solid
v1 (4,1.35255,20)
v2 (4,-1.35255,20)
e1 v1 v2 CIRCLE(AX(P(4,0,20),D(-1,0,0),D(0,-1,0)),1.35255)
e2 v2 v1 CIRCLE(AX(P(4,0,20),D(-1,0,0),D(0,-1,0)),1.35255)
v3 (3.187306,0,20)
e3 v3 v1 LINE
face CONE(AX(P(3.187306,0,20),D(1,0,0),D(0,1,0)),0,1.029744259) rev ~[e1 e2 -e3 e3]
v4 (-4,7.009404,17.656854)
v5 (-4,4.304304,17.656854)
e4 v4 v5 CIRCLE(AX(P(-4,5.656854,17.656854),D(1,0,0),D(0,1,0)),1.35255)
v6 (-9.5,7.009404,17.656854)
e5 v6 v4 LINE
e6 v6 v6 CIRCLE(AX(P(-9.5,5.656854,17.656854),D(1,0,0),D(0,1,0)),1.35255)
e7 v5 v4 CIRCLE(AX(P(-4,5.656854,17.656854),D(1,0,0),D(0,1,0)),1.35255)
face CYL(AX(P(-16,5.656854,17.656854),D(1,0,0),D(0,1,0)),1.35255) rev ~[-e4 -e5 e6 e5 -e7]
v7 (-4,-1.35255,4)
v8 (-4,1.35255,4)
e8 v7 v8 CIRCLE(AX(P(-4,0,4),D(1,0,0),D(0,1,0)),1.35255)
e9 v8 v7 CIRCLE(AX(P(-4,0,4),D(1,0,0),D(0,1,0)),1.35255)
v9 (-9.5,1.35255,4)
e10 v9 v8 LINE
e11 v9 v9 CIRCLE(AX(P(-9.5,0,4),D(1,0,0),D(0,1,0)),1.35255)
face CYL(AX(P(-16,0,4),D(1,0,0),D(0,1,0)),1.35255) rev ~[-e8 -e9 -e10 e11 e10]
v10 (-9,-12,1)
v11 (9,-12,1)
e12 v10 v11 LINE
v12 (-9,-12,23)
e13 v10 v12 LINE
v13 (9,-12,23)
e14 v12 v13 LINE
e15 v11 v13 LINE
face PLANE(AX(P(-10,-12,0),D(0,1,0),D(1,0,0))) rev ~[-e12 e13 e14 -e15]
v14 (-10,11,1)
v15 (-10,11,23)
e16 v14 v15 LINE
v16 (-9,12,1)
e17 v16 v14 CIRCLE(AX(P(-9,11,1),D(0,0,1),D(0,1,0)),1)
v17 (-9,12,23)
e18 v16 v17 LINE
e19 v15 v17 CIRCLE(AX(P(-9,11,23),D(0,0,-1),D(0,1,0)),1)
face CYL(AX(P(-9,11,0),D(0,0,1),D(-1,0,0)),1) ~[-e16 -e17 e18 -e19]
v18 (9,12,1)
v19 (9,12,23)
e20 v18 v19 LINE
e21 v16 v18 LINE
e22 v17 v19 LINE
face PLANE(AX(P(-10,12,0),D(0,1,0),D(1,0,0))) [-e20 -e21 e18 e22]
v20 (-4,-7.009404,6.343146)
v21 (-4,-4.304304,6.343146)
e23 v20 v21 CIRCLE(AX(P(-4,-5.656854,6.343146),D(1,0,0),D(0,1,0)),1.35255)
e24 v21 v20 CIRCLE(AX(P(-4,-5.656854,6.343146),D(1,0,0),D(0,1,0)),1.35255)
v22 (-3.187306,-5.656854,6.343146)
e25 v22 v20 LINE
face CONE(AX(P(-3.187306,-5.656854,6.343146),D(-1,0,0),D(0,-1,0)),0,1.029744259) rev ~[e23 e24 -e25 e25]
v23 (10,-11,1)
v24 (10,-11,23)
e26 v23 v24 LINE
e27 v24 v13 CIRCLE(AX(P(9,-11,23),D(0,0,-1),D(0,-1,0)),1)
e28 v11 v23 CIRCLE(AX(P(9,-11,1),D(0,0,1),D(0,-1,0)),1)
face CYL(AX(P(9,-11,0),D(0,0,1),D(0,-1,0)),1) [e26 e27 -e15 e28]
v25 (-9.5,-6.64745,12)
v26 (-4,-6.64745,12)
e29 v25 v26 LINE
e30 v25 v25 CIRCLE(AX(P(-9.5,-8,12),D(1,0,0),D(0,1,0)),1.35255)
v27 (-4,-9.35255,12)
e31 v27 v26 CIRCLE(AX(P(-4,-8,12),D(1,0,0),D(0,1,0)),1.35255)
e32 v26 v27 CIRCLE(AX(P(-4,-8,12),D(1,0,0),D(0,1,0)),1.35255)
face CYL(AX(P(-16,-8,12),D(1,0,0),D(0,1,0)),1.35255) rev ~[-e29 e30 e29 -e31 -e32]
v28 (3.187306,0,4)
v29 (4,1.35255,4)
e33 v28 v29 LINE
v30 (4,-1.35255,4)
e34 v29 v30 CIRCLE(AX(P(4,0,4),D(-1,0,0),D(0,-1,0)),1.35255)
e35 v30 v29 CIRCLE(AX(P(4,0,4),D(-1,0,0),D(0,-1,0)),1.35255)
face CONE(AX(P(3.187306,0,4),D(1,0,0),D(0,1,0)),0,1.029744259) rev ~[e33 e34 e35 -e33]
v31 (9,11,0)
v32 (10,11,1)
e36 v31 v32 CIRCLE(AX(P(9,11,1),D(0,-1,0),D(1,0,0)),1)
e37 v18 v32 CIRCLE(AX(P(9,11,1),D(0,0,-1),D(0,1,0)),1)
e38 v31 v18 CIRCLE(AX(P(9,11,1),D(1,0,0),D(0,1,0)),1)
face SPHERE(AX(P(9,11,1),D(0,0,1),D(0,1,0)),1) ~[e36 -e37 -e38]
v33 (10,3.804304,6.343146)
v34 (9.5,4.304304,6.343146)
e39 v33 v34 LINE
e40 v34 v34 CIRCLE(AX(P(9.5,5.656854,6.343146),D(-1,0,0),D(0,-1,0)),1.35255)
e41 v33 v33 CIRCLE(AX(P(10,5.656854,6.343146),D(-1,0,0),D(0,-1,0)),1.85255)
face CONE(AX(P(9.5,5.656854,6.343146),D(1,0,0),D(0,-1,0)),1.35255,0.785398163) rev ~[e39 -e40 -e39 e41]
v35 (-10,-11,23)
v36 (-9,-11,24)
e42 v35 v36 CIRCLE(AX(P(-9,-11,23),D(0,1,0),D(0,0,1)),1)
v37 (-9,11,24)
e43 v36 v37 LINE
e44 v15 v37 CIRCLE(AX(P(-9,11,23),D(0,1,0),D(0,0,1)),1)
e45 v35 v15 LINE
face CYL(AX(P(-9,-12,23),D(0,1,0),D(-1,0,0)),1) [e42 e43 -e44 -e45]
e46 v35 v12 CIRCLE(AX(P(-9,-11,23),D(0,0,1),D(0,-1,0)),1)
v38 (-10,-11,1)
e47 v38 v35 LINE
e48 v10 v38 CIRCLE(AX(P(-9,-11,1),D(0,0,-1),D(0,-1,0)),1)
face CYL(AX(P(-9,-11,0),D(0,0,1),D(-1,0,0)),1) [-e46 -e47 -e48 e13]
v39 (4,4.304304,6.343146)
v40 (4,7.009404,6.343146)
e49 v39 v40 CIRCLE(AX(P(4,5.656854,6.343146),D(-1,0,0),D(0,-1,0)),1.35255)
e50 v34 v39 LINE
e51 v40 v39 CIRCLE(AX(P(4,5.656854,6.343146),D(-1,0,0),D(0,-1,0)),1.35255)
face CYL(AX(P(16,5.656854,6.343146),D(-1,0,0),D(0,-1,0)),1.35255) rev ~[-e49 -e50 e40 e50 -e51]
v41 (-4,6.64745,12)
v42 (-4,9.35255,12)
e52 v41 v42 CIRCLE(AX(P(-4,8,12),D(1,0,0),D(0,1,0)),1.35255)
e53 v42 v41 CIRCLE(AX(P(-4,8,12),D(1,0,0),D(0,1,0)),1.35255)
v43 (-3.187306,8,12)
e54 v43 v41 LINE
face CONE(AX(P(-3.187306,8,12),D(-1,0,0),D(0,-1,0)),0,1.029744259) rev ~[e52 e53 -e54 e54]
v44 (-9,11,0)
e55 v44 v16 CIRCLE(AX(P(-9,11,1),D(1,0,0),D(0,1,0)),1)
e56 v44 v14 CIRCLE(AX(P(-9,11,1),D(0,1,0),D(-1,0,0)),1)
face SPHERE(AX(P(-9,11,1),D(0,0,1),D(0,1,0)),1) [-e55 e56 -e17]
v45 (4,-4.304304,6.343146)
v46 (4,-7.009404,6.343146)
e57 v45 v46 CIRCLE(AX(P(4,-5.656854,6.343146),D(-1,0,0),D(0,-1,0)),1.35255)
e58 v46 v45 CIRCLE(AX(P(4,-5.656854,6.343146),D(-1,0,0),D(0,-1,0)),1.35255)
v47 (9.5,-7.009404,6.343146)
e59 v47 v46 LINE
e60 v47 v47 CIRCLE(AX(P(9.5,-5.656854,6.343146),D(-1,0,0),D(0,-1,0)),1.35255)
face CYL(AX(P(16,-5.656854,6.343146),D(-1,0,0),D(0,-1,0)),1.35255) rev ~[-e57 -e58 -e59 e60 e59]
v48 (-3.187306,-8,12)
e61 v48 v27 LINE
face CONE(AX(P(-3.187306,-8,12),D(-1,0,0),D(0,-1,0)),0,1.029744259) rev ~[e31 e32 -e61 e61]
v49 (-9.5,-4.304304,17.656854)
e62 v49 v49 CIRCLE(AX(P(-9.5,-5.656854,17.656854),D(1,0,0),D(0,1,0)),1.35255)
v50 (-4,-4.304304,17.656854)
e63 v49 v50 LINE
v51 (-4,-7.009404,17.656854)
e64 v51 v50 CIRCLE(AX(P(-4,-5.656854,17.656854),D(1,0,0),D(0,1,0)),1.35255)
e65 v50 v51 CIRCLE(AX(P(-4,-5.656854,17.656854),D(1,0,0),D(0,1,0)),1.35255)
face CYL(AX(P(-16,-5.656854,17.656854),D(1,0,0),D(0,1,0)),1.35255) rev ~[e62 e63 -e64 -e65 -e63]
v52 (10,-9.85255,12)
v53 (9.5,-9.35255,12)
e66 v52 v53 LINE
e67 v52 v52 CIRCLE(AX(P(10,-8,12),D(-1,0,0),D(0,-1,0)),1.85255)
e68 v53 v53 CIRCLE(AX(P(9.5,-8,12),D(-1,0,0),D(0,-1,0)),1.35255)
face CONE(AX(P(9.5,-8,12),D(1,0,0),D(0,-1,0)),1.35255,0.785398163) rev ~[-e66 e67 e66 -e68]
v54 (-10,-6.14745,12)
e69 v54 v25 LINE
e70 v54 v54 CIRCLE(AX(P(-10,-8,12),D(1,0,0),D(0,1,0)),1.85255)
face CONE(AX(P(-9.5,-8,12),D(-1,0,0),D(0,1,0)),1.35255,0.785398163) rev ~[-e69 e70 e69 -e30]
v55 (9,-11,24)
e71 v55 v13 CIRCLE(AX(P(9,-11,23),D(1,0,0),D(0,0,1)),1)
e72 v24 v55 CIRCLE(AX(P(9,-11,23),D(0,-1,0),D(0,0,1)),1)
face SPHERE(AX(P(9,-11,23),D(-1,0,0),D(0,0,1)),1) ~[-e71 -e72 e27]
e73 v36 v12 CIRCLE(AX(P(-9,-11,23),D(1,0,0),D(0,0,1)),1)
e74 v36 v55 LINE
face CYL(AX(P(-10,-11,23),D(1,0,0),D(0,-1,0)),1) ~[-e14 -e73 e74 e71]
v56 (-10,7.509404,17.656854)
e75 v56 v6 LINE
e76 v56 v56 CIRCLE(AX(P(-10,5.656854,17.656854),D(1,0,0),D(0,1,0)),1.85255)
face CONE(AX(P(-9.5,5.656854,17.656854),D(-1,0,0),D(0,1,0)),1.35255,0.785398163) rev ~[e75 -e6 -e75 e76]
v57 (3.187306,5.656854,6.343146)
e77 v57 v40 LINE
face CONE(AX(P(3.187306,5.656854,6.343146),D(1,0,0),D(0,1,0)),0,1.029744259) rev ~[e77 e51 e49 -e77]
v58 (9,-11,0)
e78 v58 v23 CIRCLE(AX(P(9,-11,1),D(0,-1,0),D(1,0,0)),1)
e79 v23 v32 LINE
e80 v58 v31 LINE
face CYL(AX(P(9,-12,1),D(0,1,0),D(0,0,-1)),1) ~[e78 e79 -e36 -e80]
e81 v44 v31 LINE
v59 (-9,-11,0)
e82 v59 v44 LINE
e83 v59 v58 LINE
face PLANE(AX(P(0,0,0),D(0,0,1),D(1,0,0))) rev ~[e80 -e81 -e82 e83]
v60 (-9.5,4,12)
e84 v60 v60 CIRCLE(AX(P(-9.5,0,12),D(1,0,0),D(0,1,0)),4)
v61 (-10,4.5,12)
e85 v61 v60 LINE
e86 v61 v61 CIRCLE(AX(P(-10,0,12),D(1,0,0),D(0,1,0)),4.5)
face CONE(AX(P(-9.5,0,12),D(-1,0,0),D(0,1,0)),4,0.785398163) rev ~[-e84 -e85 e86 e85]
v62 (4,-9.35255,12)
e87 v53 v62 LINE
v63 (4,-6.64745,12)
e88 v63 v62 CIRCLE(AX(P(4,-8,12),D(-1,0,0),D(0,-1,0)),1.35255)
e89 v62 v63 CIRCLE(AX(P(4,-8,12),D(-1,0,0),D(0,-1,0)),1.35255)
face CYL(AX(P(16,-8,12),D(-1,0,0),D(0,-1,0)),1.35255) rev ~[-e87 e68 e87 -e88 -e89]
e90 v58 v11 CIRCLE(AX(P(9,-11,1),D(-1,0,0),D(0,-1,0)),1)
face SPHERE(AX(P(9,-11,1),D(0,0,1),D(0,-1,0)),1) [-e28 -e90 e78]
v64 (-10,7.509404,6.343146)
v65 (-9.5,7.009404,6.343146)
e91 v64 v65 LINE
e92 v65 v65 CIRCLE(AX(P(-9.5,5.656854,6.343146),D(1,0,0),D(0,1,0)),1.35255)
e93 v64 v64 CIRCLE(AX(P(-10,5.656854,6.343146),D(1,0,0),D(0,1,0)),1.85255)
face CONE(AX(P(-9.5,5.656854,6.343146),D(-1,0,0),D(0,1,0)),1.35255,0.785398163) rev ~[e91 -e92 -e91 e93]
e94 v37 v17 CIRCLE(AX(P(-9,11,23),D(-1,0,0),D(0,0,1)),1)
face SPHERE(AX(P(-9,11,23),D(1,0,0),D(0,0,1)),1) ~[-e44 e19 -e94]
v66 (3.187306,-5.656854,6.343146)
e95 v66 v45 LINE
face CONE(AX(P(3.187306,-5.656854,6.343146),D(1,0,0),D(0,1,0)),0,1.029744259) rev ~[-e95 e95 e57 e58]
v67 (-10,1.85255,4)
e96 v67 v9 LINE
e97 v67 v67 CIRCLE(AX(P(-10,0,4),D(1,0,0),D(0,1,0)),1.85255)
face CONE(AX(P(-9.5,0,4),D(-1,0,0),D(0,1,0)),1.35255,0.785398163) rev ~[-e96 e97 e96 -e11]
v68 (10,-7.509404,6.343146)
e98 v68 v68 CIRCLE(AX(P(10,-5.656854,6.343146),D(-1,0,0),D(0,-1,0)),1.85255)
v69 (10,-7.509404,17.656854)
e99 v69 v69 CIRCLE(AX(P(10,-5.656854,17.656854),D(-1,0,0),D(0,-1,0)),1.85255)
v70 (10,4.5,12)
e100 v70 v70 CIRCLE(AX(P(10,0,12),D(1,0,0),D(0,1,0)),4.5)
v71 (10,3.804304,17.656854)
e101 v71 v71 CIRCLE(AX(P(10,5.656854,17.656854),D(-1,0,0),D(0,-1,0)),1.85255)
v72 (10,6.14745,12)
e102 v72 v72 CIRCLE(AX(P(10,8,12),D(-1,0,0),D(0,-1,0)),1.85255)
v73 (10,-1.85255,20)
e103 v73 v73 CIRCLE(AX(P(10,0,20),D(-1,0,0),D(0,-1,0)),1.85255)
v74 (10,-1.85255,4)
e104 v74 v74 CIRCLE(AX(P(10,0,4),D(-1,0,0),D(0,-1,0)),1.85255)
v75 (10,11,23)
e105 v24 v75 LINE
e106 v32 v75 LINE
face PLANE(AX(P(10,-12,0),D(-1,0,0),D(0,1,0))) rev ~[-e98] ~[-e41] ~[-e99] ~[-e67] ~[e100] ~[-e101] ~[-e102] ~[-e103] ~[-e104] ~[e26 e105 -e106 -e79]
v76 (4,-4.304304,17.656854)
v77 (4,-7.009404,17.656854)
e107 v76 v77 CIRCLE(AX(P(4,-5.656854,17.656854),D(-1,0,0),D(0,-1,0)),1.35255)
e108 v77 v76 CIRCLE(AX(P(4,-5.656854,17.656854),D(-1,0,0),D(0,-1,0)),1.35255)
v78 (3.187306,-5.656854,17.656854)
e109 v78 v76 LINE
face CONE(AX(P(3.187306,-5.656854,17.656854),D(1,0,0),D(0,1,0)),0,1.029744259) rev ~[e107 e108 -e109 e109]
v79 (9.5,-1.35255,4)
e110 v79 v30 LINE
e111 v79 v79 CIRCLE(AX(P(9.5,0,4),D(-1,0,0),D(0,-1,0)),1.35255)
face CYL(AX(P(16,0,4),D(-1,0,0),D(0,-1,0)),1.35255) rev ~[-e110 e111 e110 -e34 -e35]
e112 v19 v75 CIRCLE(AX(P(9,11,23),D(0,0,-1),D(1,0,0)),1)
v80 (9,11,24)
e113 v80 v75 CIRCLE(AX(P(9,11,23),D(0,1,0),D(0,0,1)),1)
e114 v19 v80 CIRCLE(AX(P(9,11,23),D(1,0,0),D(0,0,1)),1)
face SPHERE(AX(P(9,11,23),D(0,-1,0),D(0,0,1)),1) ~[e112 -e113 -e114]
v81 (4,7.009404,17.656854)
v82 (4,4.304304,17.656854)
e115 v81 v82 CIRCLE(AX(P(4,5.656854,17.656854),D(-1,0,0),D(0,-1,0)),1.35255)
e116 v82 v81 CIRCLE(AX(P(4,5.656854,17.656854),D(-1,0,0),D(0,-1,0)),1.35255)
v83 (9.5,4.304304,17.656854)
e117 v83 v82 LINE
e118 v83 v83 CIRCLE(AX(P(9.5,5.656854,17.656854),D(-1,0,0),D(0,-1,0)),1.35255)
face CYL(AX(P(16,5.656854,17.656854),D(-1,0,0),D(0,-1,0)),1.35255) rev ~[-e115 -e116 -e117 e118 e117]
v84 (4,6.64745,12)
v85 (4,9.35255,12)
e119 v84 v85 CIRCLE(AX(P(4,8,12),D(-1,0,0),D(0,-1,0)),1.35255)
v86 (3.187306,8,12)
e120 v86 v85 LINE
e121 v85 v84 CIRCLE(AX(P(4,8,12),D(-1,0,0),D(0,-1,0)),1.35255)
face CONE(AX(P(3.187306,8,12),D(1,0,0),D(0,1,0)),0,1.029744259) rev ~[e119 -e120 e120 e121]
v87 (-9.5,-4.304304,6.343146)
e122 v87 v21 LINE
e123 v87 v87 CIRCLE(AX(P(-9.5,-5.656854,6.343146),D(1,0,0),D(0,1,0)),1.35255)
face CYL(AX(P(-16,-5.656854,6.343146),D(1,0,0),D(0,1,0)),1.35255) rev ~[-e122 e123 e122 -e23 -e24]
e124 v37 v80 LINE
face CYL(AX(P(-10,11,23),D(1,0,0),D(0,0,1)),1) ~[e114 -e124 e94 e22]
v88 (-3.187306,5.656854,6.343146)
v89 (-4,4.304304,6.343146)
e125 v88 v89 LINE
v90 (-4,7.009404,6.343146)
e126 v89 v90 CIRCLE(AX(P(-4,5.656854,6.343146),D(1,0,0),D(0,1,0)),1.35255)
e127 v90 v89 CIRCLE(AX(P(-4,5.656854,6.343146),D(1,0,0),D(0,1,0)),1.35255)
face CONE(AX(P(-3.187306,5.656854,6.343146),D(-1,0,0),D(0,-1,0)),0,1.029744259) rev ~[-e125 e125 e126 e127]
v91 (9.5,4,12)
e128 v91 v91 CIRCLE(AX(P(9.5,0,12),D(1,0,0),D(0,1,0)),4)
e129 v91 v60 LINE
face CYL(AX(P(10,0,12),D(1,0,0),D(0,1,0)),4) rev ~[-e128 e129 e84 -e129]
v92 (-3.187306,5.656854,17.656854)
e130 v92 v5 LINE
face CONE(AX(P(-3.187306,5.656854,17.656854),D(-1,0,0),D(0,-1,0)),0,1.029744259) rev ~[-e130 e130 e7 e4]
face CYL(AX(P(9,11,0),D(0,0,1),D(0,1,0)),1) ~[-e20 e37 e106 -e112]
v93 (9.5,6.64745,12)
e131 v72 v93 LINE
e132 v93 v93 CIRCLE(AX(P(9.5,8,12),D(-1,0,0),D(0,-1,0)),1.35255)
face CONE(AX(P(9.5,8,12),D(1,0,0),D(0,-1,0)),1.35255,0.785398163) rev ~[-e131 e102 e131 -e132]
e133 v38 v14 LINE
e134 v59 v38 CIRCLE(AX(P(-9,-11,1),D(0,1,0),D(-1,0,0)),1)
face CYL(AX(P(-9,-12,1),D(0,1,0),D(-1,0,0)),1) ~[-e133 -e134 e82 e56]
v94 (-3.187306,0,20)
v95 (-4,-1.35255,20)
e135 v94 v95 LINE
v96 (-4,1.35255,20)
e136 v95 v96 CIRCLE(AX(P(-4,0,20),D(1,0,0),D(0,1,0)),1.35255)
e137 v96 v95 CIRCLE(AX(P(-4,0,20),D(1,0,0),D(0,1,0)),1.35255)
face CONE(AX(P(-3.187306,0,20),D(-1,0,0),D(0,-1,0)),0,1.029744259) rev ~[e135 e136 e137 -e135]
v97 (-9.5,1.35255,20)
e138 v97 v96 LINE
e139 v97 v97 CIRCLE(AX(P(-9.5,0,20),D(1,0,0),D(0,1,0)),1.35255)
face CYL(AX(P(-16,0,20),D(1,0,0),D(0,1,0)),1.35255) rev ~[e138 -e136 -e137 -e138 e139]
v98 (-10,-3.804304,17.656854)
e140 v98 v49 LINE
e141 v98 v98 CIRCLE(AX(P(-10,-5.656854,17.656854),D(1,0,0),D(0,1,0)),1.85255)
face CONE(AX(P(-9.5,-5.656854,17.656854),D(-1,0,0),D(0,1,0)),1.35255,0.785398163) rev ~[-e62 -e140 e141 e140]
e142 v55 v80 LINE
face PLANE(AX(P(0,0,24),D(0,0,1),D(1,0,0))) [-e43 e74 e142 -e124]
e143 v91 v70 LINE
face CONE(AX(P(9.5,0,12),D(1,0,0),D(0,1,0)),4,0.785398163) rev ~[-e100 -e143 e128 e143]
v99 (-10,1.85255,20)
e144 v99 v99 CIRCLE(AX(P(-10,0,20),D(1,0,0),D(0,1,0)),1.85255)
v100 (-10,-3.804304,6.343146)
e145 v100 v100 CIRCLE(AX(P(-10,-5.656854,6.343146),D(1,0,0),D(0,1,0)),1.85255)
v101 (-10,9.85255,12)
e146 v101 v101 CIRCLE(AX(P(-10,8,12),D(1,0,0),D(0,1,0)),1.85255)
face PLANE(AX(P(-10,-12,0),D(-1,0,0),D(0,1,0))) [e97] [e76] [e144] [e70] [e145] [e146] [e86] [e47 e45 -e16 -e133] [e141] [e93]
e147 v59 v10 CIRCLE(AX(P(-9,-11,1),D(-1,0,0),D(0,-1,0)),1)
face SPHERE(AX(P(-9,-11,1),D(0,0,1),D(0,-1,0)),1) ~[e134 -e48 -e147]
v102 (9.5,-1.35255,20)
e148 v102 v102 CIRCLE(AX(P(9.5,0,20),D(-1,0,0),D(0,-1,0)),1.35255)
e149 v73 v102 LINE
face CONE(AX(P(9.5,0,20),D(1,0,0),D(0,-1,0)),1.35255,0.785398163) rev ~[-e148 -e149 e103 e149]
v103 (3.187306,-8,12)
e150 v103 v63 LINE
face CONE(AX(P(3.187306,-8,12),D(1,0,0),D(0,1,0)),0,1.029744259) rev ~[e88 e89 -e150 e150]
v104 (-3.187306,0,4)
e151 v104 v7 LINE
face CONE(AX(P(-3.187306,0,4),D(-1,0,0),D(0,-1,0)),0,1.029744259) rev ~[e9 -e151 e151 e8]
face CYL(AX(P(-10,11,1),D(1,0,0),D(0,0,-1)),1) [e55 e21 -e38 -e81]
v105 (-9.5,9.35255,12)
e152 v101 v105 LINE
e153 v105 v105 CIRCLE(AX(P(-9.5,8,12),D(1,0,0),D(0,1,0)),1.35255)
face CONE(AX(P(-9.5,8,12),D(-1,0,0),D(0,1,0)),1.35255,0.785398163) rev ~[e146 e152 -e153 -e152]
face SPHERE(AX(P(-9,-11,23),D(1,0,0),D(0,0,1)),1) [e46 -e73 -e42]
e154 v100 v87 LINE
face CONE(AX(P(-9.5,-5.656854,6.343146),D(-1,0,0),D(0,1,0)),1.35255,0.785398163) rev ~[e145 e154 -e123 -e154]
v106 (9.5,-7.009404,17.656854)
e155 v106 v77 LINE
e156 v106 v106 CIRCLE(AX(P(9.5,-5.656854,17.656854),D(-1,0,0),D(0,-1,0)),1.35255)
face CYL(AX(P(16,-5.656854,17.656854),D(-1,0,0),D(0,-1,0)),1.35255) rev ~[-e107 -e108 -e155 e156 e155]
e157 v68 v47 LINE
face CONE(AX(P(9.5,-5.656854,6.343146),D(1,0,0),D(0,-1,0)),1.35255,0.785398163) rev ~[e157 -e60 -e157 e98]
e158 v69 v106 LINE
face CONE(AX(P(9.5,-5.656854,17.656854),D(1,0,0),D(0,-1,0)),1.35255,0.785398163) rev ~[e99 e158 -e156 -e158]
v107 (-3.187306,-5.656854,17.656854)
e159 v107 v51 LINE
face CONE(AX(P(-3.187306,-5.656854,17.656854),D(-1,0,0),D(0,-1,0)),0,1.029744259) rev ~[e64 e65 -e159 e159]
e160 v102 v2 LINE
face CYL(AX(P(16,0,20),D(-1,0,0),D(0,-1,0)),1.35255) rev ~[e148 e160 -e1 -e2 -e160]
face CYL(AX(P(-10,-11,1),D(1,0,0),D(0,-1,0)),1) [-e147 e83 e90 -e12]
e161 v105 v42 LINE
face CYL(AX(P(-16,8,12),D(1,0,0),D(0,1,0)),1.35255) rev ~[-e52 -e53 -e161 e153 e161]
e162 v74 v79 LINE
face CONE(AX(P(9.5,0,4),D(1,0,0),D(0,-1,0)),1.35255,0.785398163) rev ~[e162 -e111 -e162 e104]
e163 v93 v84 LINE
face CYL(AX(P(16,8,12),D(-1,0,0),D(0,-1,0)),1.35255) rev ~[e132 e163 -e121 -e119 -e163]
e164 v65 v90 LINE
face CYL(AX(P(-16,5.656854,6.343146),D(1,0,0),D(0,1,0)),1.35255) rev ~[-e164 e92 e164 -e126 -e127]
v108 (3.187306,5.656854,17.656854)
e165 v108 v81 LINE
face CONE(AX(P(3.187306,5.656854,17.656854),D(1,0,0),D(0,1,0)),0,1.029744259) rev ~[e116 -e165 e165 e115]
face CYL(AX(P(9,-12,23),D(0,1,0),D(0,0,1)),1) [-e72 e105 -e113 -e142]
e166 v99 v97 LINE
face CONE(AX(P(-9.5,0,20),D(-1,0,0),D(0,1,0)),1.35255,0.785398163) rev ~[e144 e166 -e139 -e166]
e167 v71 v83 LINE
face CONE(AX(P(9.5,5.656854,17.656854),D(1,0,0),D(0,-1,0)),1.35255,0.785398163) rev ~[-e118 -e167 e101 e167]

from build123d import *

# Parameters (mm, degrees)
F0_W     = 20
F0_H     = 24
F1_DEPTH = 24
F2_R     = 4
F3_DEPTH = 20.001
F5_D     = 2.7051
F5_DEPTH = 6
F5_TIP   = 0.8126940303
F7_D     = 2.7051
F7_DEPTH = 6
F7_TIP   = 0.8126940303
F8_R     = 1
F9_SIZE  = 0.5


with BuildPart() as f1:
    # F0 (on Top) → F1 (new body)
    with BuildSketch(Plane.XY):
        Rectangle(F0_W, F0_H)
    extrude(amount=F1_DEPTH)

    # F2 (on face) → F3 (cut, through all)
    with BuildSketch(Plane.YZ.offset(10)):
        with Locations((0, 12)):
            Circle(F2_R)
    extrude(amount=-F3_DEPTH, mode=Mode.SUBTRACT)

    # F5
    with Locations(Plane.YZ.offset(10)):
        with Locations((0, 20), (5.6568542495, 17.6568542495), (8, 12), (5.6568542495, 6.3431457505), (0, 4), (-5.6568542495, 6.3431457505), (-8, 12), (-5.6568542495, 17.6568542495)):
            Hole(F5_D / 2, depth=F5_DEPTH)
            with Locations((0, 0, -(F5_DEPTH + F5_TIP / 2))):  # 118° drill point
                Cone(0, F5_D / 2, F5_TIP, mode=Mode.SUBTRACT)

    # F7
    with Locations(Plane(origin=(-10, 0, 0), x_dir=(0, -1, 0), z_dir=(-1, 0, 0))):
        with Locations((0, 20), (5.6568542495, 17.6568542495), (8, 12), (5.6568542495, 6.3431457505), (0, 4), (-5.6568542495, 6.3431457505), (-8, 12), (-5.6568542495, 17.6568542495)):
            Hole(F7_D / 2, depth=F7_DEPTH)
            with Locations((0, 0, -(F7_DEPTH + F7_TIP / 2))):  # 118° drill point
                Cone(0, F7_D / 2, F7_TIP, mode=Mode.SUBTRACT)

    # F8
    f8_edges = [f1.edges().sort_by_distance(p)[0] for p in [
        (0, -12, 24),
        (10, 0, 24),
        (0, 12, 24),
        (-10, 0, 24),
        (-10, -12, 12),
        (10, -12, 12),
        (0, -12, 0),
        (10, 12, 12),
        (-10, 12, 12),
        (0, 12, 0),
        (10, 0, 0),
        (-10, 0, 0),
    ]]
    fillet(f8_edges, radius=F8_R)

    # F9
    f9_edges = [f1.edges().sort_by_distance(p)[0] for p in [
        (10, -4, 12),
        (-10, -4, 12),
        (-10, 7.009404, 17.656854),
        (-10, 1.35255, 20),
        (-10, -4.304304, 17.656854),
        (-10, 9.35255, 12),
        (-10, 7.009404, 6.343146),
        (-10, -6.64745, 12),
        (-10, 1.35255, 4),
        (-10, -4.304304, 6.343146),
        (10, -7.009404, 17.656854),
        (10, -1.35255, 20),
        (10, 4.304304, 17.656854),
        (10, -9.35255, 12),
        (10, -7.009404, 6.343146),
        (10, 6.64745, 12),
        (10, -1.35255, 4),
        (10, 4.304304, 6.343146),
    ]]
    chamfer(f9_edges, length=F9_SIZE)


solid = f1.part
